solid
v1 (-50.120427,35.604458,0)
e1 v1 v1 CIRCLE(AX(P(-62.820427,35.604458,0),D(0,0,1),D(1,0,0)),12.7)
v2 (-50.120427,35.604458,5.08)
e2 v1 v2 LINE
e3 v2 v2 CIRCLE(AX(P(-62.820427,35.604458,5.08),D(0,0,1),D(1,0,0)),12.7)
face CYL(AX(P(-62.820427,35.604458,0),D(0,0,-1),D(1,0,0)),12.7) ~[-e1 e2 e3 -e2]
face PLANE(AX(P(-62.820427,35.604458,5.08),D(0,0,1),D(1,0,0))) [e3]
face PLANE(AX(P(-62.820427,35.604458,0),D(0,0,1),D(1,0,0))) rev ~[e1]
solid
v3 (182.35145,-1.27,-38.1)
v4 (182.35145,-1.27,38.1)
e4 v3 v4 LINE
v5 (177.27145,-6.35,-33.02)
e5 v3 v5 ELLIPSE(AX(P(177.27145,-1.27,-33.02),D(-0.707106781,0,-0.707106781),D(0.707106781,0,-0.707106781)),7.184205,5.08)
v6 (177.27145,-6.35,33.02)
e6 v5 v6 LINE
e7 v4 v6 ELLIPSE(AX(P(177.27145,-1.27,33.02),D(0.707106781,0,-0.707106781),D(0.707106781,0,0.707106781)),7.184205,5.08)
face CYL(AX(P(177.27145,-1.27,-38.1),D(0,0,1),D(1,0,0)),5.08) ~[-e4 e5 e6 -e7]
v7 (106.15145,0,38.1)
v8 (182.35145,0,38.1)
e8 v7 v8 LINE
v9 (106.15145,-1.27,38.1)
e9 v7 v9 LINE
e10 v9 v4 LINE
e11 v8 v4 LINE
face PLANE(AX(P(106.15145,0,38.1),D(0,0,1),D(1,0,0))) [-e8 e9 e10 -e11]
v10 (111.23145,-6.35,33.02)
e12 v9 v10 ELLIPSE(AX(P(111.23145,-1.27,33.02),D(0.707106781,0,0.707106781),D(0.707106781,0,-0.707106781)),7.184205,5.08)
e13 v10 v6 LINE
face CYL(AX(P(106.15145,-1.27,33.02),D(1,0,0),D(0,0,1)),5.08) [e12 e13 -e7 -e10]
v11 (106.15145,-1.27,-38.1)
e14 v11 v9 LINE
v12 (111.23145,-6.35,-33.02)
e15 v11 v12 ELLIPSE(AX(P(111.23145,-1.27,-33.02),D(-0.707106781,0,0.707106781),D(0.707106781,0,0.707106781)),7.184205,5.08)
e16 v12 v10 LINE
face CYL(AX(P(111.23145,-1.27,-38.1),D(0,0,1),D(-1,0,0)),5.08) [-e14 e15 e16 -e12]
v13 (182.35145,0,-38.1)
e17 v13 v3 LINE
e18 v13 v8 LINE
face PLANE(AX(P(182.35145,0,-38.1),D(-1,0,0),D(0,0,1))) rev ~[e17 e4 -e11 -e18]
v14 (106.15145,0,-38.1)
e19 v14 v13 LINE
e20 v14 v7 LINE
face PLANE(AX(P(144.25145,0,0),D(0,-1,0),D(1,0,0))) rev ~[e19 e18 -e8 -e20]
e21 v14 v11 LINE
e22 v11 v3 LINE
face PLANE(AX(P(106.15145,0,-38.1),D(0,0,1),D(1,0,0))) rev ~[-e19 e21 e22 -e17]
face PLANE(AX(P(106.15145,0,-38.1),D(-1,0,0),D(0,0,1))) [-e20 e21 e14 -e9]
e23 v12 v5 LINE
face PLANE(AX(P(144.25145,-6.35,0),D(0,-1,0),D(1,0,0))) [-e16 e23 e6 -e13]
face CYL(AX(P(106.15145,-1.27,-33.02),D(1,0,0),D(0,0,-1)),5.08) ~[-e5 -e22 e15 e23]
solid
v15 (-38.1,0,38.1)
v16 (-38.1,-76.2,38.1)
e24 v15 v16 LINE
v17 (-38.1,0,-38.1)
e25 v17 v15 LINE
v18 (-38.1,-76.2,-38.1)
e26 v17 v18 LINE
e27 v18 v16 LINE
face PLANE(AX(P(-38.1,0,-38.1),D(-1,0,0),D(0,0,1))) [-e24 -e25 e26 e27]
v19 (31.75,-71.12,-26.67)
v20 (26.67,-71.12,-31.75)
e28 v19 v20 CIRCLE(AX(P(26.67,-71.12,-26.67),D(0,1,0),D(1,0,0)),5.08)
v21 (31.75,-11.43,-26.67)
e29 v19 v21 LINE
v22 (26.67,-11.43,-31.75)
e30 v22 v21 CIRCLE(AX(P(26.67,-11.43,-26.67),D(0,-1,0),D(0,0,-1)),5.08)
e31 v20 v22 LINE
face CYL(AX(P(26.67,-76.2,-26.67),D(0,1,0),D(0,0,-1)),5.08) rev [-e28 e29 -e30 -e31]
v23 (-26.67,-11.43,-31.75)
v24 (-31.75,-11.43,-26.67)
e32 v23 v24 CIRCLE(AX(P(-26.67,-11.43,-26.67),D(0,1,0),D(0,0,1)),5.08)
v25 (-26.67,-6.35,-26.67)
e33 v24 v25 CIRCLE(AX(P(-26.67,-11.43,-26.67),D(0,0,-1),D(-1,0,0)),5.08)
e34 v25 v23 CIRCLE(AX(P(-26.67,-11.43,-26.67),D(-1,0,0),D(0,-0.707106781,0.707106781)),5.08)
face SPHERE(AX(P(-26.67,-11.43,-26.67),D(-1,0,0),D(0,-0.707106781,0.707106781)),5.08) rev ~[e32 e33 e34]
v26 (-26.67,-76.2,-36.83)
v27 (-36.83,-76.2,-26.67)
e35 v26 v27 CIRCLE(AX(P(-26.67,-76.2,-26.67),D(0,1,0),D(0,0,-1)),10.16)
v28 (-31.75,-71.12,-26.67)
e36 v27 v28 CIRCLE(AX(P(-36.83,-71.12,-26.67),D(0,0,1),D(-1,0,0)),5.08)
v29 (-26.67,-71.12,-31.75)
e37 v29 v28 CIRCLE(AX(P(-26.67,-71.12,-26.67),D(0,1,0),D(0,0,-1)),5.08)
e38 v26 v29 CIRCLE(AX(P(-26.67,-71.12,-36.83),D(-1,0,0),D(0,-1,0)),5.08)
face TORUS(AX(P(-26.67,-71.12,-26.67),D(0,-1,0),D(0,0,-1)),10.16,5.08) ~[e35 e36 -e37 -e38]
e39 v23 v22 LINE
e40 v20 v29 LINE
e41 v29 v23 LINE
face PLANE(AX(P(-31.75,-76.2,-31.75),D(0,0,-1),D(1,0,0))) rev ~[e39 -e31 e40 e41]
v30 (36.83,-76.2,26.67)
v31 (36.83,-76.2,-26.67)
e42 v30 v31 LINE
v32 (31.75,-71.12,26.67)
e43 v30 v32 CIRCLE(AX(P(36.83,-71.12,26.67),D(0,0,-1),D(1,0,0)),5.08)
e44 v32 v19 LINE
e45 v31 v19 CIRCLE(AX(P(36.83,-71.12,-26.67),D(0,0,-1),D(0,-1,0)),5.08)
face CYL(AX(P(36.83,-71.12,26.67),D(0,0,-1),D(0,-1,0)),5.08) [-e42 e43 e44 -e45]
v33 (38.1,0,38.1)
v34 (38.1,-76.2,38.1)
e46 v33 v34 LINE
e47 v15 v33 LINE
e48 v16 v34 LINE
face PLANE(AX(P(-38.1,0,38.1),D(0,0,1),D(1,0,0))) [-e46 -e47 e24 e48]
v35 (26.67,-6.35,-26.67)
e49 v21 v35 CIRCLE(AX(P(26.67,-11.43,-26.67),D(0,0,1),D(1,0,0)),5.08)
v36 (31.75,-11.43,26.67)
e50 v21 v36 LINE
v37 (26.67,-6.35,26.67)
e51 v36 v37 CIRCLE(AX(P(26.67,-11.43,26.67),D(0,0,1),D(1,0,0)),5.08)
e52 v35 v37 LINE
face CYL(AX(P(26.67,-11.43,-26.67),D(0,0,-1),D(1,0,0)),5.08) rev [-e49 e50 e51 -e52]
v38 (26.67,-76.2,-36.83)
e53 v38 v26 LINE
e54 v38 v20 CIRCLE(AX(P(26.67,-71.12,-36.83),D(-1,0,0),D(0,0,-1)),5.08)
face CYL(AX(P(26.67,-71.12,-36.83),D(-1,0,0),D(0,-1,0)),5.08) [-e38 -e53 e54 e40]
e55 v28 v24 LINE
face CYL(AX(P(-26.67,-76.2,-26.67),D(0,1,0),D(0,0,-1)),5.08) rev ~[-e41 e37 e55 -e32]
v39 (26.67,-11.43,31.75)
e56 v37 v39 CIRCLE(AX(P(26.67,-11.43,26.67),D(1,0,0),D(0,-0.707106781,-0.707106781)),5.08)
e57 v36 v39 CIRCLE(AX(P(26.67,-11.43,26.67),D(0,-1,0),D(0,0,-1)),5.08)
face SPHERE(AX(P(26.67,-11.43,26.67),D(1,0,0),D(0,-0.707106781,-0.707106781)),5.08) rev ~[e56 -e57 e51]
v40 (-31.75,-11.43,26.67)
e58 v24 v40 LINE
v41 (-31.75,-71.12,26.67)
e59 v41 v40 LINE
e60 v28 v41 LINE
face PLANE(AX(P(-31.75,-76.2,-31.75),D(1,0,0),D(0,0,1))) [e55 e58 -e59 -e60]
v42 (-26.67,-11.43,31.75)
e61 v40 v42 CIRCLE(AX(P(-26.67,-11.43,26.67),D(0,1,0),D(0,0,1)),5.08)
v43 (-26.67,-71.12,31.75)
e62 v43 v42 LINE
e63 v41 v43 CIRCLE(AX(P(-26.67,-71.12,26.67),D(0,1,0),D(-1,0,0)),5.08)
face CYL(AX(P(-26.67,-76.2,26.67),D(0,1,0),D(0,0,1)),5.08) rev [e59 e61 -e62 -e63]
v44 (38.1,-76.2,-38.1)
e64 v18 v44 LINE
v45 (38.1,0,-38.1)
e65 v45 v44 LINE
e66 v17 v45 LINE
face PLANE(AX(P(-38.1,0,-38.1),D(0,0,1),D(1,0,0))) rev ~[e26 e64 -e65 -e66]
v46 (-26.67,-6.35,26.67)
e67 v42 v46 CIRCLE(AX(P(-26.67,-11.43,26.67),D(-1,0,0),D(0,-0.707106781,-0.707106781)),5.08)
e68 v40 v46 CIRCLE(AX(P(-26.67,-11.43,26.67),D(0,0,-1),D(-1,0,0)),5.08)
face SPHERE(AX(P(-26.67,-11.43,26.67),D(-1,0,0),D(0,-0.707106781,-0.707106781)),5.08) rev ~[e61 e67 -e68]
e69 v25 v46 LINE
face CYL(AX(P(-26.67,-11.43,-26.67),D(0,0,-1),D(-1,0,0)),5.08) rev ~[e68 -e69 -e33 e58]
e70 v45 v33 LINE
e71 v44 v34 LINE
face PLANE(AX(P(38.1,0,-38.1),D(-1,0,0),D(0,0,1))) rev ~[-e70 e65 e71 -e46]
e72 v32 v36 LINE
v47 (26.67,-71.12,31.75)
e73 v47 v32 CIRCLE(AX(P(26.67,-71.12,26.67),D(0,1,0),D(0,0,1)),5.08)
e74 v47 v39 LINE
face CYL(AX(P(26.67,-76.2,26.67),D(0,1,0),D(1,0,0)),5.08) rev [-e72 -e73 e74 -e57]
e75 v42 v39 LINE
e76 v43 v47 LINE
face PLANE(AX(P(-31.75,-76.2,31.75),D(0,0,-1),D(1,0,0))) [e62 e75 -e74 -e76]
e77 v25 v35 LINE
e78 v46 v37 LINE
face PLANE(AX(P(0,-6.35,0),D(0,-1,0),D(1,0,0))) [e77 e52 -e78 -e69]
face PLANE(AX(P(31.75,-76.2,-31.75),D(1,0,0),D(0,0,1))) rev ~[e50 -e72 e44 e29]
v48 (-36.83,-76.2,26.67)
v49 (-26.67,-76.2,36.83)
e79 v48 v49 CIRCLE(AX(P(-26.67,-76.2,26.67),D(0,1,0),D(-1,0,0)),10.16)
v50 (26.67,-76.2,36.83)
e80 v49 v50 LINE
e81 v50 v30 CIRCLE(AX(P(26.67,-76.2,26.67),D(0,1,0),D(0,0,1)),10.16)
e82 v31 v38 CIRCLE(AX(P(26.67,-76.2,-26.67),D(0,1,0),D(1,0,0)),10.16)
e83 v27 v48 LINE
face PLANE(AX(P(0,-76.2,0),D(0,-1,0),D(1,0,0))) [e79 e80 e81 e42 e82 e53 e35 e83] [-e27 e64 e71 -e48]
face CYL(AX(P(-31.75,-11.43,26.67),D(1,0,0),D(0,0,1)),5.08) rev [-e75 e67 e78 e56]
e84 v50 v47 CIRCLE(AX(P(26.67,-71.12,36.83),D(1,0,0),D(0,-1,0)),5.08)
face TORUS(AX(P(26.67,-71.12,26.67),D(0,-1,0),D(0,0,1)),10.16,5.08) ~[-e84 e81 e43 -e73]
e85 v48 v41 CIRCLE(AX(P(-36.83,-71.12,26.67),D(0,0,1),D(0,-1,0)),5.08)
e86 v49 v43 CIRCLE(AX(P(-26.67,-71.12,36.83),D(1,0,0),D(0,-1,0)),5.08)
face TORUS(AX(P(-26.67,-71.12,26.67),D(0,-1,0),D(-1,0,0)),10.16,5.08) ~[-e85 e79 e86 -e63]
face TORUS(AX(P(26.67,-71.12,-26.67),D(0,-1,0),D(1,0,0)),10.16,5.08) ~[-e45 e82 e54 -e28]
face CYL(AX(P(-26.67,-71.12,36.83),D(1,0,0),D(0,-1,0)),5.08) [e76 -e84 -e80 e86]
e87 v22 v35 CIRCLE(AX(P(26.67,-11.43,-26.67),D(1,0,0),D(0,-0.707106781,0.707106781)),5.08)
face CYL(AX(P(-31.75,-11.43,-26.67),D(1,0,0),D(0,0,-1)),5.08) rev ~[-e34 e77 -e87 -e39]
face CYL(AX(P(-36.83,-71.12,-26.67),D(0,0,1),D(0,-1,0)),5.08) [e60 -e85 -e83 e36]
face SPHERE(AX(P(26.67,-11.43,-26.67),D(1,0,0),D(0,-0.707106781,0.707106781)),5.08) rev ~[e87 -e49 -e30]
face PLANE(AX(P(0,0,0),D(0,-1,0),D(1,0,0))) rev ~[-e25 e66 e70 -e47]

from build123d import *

# Parameters (mm, degrees)
F0_W         = 76.2
F0_H         = 76.2
F1_DEPTH     = 76.2
F2_W         = 63.5
F2_H         = 63.5
F3_DEPTH     = 69.85
F4_DEPTH     = 6.35
F5_R         = 5.08
F6_F1_R      = 5.08
F6_F2_R      = 5.08
F7_R         = 12.7
F8_DEPTH     = 5.08
F9_T1_DEPTH  = 53.34
F9_S5_W      = 5.08
F9_S5_H      = 5.08
F9_T6_DEPTH  = 5.08
F9_S11_W     = 5.08
F9_S11_H     = 5.08
F9_T12_DEPTH = 5.08
F9_S17_W     = 5.08
F9_S17_H     = 5.08
F9_T18_DEPTH = 5.08
F9_S23_W     = 5.08
F9_S23_H     = 5.08
F9_T24_DEPTH = 5.08


# Not quite as in the source:
# - a fillet or chamfer that OpenCascade refuses, or shapes differently, is made with other operations: its cross-section is extruded or revolved along the edge and cut away or added


with BuildPart() as f1:
    # F0 (on Front) → F1 (new body)
    with BuildSketch(Plane.XZ):
        Rectangle(F0_W, F0_H)
    extrude(amount=F1_DEPTH)

    # F2 (on face) → F3 (cut)
    with BuildSketch(Plane.XZ.offset(76.2)):
        Rectangle(F2_W, F2_H)
    extrude(amount=-F3_DEPTH, mode=Mode.SUBTRACT)

    # F6: fillet of radius 5.08 on 8 edges, made by hand

    # F6_f1
    f6_f1_edges = [f1.edges().sort_by_distance(p)[0] for p in [
        (31.75, -41.275, 31.75),
        (-31.75, -41.275, 31.75),
        (0, -6.35, 31.75),
        (-31.75, -41.275, -31.75),
        (31.75, -41.275, -31.75),
        (0, -6.35, -31.75),
    ]]
    fillet(f6_f1_edges, radius=F6_F1_R)

    # F6_f2
    f6_f2_edges = [f1.edges().sort_by_distance(p)[0] for p in [
        (0, -76.2, 31.75),
        (0, -76.2, -31.75),
        (-30.2621024484, -76.2, -30.2621024484),
        (30.2621024484, -76.2, -30.2621024484),
        (30.2621024484, -76.2, 30.2621024484),
        (-30.2621024484, -76.2, 30.2621024484),
    ]]
    fillet(f6_f2_edges, radius=F6_F2_R)

    # F9: fillet of radius 5.08 on 2 edges, made by hand

    # F9_s2 → F9_t1 (join)
    with BuildSketch(Plane.XY.offset(-26.67)):
        with BuildLine():
            ThreePointArc((-31.75, -11.43), (-30.2621024484, -7.8378975516), (-26.67, -6.35))
            Line((-26.67, -6.35), (-31.75, -6.35))
            Line((-31.75, -6.35), (-31.75, -11.43))
        make_face()
        with BuildLine():
            ThreePointArc((31.75, -11.43), (30.2621024484, -7.8378975516), (26.67, -6.35))
            Line((26.67, -6.35), (31.75, -6.35))
            Line((31.75, -6.35), (31.75, -11.43))
        make_face()
    extrude(amount=F9_T1_DEPTH)


with BuildPart() as f4:
    # F0 (on Front) → F4 (new body)
    with BuildSketch(Plane.XZ):
        with Locations((144.2514499441, 0)):
            Rectangle(F0_W, F0_H)
    extrude(amount=F4_DEPTH)

    # F5
    f5_edges = [f4.edges().sort_by_distance(p)[0] for p in [
        (144.25145, -6.35, -38.1),
        (182.35145, -6.35, 0),
        (144.25145, -6.35, 38.1),
        (106.15145, -6.35, 0),
    ]]
    fillet(f5_edges, radius=F5_R)


with BuildPart() as f8:
    # F7 (on Top) → F8 (new body)
    with BuildSketch(Plane.XY):
        with Locations((-62.8204271197, 35.6044583023)):
            Circle(F7_R)
    extrude(amount=F8_DEPTH)


with BuildPart() as f9_tool4:
    # F9_s5 → F9_t6 (new body)
    with BuildSketch(Plane.YZ.offset(26.67)):
        with Locations((-8.89, -29.21)):
            Rectangle(F9_S5_W, F9_S5_H)
    extrude(amount=F9_T6_DEPTH)

    # F9_s7 → F9_t8 (revolve, cut)
    with BuildSketch(Plane(origin=(26.67, -11.43, -26.67), x_dir=(0, -0.7071067812, 0.7071067812), z_dir=(0, 0.7071067812, 0.7071067812))):
        with BuildLine():
            ThreePointArc((0, -5.08), (5.08, 0), (0, 5.08))
            Line((0, 5.08), (0, -5.08))
        make_face()
    revolve(axis=Axis((26.67, -11.43, -26.67), (1, 0, 0)), mode=Mode.SUBTRACT)


with BuildPart() as f1_1:
    add(f1.part)

    # F9_t3: union F9_tool4
    add(f9_tool4.part)


with BuildPart() as f9_tool10:
    # F9_s11 → F9_t12 (new body)
    with BuildSketch(Plane.YZ.offset(26.67)):
        with Locations((-8.89, 29.21)):
            Rectangle(F9_S11_W, F9_S11_H)
    extrude(amount=F9_T12_DEPTH)

    # F9_s13 → F9_t14 (revolve, cut)
    with BuildSketch(Plane(origin=(26.67, -11.43, 26.67), x_dir=(0, -0.7071067812, -0.7071067812), z_dir=(0, -0.7071067812, 0.7071067812))):
        with BuildLine():
            ThreePointArc((0, -5.08), (5.08, 0), (0, 5.08))
            Line((0, 5.08), (0, -5.08))
        make_face()
    revolve(axis=Axis((26.67, -11.43, 26.67), (1, 0, 0)), mode=Mode.SUBTRACT)


with BuildPart() as f1_2:
    add(f1_1.part)

    # F9_t9: union F9_tool10
    add(f9_tool10.part)


with BuildPart() as f9_tool16:
    # F9_s17 → F9_t18 (new body)
    with BuildSketch(Plane.YZ.offset(-26.67)):
        with Locations((-8.89, 29.21)):
            Rectangle(F9_S17_W, F9_S17_H)
    extrude(amount=-F9_T18_DEPTH)

    # F9_s19 → F9_t20 (revolve, cut)
    with BuildSketch(Plane(origin=(-26.67, -11.43, 26.67), x_dir=(0, -0.7071067812, -0.7071067812), z_dir=(0, 0.7071067812, -0.7071067812))):
        with BuildLine():
            ThreePointArc((0, -5.08), (5.08, 0), (0, 5.08))
            Line((0, 5.08), (0, -5.08))
        make_face()
    revolve(axis=Axis((-26.67, -11.43, 26.67), (-1, 0, 0)), mode=Mode.SUBTRACT)


with BuildPart() as f1_3:
    add(f1_2.part)

    # F9_t15: union F9_tool16
    add(f9_tool16.part)


with BuildPart() as f9_tool22:
    # F9_s23 → F9_t24 (new body)
    with BuildSketch(Plane.YZ.offset(-26.67)):
        with Locations((-8.89, -29.21)):
            Rectangle(F9_S23_W, F9_S23_H)
    extrude(amount=-F9_T24_DEPTH)

    # F9_s25 → F9_t26 (revolve, cut)
    with BuildSketch(Plane(origin=(-26.67, -11.43, -26.67), x_dir=(0, -0.7071067812, 0.7071067812), z_dir=(0, -0.7071067812, -0.7071067812))):
        with BuildLine():
            ThreePointArc((0, -5.08), (5.08, 0), (0, 5.08))
            Line((0, 5.08), (0, -5.08))
        make_face()
    revolve(axis=Axis((-26.67, -11.43, -26.67), (-1, 0, 0)), mode=Mode.SUBTRACT)


with BuildPart() as f1_4:
    add(f1_3.part)

    # F9_t21: union F9_tool22
    add(f9_tool22.part)


solid = Compound([f4.part, f8.part, f1_4.part])
